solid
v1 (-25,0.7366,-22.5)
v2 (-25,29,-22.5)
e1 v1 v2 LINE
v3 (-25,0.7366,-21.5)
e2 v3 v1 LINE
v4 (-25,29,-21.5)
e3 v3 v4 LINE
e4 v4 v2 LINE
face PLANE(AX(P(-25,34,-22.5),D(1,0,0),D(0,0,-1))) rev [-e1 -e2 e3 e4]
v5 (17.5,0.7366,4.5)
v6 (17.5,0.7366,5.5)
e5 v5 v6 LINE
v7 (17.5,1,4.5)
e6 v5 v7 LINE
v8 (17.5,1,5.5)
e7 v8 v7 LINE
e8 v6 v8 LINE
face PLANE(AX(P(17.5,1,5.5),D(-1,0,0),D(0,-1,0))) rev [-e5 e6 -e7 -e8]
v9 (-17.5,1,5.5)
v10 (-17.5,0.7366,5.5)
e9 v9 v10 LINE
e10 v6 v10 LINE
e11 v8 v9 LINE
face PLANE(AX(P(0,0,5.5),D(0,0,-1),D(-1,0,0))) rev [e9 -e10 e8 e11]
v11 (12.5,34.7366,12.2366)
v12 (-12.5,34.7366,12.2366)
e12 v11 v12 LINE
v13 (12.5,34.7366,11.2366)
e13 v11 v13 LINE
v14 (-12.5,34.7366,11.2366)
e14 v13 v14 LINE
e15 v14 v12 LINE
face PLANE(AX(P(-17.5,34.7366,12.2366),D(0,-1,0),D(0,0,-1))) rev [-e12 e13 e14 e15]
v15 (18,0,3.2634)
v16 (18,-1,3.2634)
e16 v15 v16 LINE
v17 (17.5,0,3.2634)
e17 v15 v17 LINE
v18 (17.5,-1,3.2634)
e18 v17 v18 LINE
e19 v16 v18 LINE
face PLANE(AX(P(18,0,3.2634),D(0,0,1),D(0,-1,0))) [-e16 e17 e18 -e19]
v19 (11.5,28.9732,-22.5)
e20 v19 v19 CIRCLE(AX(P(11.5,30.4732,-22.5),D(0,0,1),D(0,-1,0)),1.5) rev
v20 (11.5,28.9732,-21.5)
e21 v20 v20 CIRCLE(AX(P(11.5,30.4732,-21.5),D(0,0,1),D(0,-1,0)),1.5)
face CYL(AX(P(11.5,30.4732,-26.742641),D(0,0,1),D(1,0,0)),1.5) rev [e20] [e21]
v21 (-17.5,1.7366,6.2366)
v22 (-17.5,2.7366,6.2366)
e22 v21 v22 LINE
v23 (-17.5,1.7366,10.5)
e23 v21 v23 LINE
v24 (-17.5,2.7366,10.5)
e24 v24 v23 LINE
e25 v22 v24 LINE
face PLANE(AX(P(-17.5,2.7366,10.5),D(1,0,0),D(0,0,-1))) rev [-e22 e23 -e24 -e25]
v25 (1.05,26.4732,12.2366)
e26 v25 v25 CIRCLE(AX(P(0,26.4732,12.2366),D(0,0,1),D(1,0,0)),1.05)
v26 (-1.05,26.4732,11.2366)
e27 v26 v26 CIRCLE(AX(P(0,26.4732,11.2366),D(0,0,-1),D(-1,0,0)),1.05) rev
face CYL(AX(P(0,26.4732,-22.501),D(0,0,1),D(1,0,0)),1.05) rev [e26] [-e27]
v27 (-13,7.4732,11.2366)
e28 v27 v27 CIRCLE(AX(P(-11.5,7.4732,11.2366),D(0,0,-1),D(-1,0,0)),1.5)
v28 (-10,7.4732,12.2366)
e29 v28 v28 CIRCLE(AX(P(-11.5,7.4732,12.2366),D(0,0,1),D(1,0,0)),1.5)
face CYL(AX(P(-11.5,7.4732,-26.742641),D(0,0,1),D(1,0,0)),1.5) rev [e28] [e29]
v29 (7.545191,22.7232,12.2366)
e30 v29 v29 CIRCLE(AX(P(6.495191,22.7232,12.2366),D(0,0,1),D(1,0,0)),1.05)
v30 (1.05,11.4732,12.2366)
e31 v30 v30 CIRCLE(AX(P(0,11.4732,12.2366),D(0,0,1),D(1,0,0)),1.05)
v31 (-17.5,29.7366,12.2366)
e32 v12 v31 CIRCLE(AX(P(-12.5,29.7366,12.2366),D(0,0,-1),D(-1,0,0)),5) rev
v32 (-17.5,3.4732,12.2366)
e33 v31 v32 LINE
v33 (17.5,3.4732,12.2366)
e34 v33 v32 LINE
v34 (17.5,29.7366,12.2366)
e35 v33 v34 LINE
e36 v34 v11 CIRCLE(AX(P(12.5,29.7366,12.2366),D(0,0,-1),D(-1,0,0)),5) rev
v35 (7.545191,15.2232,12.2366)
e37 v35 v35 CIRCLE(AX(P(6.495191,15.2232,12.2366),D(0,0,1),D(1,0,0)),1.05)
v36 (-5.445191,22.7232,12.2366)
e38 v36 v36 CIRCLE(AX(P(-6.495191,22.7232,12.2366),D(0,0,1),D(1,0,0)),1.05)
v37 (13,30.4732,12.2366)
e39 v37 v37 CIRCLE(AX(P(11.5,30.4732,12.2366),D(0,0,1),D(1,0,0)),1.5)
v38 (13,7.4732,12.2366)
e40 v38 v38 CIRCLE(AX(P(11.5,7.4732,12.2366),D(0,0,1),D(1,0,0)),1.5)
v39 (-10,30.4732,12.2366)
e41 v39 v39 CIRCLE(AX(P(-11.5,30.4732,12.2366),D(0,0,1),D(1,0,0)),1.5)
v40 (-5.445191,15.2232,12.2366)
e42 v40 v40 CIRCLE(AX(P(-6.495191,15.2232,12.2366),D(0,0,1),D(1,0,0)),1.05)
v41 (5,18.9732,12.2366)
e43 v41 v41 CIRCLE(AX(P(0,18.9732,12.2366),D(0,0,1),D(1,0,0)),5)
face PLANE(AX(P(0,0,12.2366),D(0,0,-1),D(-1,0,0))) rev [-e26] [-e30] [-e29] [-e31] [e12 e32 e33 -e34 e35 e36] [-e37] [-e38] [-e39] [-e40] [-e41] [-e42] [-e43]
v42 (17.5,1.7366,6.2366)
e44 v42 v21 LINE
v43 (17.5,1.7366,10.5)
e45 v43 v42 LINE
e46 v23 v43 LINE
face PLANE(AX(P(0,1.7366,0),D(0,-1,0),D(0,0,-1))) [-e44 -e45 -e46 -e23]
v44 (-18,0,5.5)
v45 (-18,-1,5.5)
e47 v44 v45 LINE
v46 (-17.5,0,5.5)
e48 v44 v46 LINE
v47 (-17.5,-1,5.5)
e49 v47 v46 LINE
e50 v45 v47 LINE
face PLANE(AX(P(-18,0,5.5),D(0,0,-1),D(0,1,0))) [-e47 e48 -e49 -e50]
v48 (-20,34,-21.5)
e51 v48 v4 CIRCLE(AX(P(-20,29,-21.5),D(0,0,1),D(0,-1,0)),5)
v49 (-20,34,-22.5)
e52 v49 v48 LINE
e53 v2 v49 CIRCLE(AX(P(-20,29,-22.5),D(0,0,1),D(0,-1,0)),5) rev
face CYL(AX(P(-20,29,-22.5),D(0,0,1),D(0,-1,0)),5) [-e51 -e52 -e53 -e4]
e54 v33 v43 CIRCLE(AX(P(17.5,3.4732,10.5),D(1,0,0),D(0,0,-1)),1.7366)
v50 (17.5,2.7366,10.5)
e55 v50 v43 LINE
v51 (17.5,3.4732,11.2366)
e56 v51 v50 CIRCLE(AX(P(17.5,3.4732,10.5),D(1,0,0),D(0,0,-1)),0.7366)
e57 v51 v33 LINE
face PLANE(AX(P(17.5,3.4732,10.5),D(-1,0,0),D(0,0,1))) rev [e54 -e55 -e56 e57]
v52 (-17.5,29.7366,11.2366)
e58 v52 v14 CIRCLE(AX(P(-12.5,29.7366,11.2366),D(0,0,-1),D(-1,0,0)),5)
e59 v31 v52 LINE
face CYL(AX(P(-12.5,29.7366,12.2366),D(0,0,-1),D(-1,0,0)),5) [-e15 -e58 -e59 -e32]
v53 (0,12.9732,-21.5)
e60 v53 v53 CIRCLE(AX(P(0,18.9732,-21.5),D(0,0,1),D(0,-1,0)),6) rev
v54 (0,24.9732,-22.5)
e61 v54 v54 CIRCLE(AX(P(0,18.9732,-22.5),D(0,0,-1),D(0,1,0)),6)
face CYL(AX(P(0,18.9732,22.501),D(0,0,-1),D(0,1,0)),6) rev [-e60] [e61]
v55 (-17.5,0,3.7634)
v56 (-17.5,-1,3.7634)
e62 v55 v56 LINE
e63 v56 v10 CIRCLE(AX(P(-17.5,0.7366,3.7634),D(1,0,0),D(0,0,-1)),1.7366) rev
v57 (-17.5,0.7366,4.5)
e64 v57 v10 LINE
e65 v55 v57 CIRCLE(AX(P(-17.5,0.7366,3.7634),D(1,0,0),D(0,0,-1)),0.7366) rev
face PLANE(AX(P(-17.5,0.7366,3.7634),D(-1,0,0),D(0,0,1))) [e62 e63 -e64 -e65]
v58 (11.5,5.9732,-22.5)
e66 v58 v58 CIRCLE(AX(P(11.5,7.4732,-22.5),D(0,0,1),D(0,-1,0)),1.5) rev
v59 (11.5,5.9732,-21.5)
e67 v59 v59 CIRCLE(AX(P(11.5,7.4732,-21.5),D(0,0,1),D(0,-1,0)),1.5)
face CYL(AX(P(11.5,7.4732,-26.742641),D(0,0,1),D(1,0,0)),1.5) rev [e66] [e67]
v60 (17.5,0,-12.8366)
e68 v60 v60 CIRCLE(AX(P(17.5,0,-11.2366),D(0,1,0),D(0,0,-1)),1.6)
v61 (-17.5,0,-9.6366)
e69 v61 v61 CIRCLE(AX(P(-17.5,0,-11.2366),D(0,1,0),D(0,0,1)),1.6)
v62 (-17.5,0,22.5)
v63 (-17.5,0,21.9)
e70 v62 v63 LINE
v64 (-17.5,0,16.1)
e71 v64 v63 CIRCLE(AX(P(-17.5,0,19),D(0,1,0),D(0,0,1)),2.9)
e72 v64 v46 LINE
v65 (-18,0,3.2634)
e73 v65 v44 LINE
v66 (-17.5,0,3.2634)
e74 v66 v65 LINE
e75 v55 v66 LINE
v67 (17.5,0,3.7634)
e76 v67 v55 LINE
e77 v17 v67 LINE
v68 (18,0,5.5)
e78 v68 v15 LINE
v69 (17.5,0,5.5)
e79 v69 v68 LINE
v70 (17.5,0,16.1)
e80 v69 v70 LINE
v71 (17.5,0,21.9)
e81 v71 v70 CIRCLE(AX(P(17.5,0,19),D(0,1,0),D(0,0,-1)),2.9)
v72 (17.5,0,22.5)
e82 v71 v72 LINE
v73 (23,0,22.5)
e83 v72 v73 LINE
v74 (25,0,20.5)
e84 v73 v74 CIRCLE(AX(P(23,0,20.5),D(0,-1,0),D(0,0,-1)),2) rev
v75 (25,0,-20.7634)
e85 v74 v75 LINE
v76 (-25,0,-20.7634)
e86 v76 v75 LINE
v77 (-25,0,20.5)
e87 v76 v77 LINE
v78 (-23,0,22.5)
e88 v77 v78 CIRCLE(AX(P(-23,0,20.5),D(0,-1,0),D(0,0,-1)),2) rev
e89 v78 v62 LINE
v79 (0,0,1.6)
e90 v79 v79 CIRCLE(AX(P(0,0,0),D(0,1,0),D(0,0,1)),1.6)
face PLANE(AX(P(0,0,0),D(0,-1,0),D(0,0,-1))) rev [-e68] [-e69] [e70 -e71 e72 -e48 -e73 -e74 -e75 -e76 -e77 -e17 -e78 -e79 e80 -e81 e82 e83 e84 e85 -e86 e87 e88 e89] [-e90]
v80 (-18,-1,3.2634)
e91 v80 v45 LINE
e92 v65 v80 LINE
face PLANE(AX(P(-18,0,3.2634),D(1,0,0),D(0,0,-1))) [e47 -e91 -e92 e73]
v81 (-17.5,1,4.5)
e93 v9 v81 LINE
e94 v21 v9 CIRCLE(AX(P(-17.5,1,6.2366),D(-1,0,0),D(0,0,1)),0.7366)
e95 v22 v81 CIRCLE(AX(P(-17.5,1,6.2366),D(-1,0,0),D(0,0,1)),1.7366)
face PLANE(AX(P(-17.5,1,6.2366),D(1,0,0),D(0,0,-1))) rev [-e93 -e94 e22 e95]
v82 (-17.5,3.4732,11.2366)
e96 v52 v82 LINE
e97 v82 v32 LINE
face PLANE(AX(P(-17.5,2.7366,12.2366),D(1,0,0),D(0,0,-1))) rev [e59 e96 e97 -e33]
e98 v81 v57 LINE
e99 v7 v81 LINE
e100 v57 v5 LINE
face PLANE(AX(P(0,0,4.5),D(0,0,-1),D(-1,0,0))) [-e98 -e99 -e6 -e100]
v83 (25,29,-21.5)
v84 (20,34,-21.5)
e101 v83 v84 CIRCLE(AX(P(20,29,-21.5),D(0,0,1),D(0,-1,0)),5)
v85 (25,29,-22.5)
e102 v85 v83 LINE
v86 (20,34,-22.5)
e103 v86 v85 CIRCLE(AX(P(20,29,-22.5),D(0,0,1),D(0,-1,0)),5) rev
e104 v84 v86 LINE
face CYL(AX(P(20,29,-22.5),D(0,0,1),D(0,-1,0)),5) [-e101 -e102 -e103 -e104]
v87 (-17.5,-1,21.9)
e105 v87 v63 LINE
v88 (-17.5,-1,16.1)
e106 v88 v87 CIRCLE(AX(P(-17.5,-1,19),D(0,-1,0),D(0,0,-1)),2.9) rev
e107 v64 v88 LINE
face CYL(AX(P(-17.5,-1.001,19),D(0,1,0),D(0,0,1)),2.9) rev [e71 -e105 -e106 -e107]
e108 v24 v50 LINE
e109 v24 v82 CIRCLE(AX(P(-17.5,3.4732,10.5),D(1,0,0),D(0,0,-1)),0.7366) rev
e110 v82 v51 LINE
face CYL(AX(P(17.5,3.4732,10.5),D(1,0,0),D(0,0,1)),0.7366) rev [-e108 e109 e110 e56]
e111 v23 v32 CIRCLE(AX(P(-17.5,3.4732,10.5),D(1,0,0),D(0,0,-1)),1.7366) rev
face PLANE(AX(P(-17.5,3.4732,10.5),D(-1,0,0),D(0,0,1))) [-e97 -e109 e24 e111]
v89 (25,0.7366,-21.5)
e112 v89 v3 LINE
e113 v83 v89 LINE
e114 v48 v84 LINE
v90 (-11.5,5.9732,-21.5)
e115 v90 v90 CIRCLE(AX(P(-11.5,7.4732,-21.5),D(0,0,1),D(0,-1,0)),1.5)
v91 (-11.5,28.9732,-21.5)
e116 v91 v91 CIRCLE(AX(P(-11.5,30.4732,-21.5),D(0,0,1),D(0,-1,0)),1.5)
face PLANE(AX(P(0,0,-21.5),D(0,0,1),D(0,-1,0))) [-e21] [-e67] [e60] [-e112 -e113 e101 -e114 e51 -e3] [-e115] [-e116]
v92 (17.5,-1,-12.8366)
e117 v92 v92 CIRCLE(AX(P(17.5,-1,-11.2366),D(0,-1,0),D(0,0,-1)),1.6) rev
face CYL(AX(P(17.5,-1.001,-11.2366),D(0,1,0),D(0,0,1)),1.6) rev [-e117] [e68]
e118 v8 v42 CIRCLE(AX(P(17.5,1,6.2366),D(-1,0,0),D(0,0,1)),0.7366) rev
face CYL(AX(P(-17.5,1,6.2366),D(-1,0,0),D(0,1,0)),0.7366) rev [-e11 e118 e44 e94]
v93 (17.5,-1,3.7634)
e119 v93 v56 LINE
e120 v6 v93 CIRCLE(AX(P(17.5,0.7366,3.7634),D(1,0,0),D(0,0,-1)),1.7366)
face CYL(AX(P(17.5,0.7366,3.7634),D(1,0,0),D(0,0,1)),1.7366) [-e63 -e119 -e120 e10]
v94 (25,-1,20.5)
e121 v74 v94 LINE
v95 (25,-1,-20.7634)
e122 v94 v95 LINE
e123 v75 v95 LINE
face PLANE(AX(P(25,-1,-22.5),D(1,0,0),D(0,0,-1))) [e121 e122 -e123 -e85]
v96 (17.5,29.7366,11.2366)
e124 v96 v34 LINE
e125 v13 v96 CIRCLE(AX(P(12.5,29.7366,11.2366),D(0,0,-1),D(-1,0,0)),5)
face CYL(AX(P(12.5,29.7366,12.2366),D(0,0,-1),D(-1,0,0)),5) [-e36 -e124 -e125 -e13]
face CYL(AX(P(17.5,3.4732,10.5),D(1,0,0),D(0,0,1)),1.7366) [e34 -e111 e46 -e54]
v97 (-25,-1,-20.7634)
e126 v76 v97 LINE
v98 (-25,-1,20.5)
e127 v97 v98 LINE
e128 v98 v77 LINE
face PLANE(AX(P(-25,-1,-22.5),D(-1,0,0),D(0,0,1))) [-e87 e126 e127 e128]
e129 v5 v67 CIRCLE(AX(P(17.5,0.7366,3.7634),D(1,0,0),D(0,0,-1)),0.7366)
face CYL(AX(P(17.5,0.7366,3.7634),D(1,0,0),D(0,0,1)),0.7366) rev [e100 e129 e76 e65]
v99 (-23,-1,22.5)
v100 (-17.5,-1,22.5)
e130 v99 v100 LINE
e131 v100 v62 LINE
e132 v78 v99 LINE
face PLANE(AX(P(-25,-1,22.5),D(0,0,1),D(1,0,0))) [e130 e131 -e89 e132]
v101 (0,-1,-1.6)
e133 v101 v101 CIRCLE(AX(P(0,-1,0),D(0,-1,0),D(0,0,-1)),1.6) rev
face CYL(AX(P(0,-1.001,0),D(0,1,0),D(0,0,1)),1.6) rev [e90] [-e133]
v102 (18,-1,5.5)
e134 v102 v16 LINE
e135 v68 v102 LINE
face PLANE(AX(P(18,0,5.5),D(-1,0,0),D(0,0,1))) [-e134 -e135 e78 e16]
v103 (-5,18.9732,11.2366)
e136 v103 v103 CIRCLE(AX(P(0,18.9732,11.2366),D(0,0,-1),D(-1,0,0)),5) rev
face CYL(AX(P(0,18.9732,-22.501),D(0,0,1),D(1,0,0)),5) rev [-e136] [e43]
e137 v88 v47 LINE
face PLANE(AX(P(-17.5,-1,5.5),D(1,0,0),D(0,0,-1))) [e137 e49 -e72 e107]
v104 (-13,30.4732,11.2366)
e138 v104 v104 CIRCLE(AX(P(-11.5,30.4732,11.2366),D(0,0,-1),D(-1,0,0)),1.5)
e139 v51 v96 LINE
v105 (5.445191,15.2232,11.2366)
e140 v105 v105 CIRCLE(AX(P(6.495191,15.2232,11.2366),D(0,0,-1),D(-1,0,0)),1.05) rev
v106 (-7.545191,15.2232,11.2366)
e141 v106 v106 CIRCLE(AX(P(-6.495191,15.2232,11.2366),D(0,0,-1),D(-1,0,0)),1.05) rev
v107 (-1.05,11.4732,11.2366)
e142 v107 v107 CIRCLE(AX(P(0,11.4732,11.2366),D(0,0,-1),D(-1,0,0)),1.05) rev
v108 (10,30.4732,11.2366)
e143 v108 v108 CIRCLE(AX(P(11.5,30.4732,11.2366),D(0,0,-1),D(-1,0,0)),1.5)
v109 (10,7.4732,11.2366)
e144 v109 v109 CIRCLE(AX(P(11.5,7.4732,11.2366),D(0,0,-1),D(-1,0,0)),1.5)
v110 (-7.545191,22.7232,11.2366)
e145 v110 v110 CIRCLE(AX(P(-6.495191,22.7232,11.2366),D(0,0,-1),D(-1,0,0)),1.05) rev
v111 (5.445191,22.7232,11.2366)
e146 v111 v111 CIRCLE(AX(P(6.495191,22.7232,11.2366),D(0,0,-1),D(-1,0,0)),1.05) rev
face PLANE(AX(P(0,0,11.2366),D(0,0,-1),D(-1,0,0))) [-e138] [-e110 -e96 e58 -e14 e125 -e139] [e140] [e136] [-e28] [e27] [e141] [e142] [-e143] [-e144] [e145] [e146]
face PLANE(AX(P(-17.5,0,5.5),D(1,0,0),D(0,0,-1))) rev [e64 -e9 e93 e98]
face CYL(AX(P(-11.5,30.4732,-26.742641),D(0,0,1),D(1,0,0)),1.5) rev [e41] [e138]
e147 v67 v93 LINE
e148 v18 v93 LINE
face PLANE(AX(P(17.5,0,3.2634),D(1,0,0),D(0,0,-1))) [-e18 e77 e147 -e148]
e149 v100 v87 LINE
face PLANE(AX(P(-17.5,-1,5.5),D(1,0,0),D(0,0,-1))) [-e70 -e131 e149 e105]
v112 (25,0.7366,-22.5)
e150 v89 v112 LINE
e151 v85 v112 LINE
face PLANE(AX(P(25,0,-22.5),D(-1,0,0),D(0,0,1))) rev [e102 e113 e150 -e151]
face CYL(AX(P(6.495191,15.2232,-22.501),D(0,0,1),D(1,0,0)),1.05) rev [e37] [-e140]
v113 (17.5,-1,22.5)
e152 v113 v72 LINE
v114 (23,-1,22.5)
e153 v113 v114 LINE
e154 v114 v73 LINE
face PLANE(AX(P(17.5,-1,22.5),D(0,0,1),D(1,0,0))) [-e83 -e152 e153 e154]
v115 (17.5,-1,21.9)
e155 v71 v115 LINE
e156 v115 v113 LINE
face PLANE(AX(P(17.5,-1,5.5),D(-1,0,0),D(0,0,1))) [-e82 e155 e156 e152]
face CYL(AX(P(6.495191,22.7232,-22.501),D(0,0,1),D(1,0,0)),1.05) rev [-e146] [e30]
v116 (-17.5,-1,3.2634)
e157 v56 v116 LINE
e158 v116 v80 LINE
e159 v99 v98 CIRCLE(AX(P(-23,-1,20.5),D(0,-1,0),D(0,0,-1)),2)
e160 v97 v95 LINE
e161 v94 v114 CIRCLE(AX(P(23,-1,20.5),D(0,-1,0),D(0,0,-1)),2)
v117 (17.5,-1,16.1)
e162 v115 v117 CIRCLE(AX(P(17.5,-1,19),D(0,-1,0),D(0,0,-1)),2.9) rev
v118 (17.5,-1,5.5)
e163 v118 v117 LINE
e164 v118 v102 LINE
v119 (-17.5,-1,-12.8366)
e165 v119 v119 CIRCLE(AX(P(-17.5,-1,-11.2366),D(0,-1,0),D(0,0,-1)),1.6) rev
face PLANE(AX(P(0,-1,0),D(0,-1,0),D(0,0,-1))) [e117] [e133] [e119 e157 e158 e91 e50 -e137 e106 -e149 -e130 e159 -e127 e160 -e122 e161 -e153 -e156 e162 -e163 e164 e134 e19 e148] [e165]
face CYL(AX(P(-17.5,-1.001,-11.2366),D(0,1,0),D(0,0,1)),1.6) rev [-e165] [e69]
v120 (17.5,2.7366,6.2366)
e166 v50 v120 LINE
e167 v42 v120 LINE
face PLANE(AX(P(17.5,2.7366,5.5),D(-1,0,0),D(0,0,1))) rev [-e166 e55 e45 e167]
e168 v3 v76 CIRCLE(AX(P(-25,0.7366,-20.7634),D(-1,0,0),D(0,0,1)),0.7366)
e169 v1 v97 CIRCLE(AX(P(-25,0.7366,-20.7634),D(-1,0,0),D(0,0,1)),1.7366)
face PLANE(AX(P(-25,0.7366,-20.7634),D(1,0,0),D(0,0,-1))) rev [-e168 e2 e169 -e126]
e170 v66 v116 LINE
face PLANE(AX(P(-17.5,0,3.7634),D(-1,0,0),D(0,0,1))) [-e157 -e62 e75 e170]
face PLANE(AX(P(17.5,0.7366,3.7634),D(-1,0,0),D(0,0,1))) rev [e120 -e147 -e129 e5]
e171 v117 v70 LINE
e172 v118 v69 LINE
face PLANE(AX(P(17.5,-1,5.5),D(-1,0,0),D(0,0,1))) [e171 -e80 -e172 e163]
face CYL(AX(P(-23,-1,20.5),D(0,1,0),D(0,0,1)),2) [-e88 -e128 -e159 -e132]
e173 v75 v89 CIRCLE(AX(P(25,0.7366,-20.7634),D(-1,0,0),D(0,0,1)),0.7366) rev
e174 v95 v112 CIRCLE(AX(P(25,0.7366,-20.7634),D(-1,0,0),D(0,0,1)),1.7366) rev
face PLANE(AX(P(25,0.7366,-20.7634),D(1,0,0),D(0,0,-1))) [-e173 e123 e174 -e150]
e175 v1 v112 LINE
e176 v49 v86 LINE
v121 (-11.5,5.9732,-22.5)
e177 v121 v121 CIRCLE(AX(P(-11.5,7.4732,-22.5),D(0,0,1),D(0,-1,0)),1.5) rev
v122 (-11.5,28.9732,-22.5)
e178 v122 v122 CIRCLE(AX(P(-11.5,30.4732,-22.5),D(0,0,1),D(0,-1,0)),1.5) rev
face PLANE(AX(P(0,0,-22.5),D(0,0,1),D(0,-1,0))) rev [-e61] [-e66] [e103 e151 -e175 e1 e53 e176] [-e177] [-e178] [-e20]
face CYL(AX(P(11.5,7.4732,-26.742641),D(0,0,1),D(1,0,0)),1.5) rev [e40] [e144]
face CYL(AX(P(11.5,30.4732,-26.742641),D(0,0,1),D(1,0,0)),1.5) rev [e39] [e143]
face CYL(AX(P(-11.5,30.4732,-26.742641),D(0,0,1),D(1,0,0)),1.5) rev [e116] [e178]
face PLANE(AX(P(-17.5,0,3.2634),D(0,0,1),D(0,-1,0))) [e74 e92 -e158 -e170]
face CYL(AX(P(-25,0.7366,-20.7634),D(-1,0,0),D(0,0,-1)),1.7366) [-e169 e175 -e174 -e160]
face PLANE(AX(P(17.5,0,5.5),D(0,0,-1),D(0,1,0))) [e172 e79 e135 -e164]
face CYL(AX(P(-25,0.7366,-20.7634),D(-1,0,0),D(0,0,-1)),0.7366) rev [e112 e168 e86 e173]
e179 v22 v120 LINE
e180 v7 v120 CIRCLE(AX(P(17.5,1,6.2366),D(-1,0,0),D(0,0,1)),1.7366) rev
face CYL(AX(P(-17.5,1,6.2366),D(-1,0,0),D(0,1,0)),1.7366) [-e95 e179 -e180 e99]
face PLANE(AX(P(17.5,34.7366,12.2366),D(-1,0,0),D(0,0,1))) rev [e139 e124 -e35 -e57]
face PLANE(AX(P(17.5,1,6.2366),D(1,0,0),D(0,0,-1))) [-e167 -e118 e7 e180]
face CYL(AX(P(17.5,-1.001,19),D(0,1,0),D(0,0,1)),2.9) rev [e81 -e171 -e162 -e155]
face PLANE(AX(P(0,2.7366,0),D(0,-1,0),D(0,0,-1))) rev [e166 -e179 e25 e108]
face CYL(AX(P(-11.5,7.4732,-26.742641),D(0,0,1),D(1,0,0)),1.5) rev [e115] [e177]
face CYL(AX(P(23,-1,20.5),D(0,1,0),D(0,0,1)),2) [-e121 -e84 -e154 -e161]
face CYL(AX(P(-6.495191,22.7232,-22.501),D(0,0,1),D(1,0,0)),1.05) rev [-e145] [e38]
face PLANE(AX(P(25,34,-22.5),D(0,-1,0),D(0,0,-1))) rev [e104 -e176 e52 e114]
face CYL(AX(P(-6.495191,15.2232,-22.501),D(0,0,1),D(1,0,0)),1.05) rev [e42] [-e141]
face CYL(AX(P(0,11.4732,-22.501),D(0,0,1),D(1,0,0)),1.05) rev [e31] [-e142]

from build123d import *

# Parameters (mm, degrees)
SM_BASE_FLANGE_1_DEPTH           = 1
SM_START                         = -18
SM_EDGE_FLANGE_1_DEPTH           = 36
SM_EDGE_FLANGE_1_2_DEPTH         = 0.5
SM_START_2                       = 17.5
SM_EDGE_FLANGE_1_3_DEPTH         = 0.5
SM_START_3                       = -17.5
SM_EDGE_FLANGE_1_4_DEPTH         = 35
SM_EDGE_FLANGE_3_DEPTH           = 35
SM_EDGE_FLANGE_4_DEPTH           = 35
CUT_EXTRUDE_1_REACH              = 57.12
SKETCH_10_R                      = 1.05
SKETCH_10_R_2                    = 5
SM_EDGE_FLANGE_2_STRIP_W         = 5.4732
SM_EDGE_FLANGE_2_STRIP_H         = 1
SM_EDGE_FLANGE_2_STRIP_CUT_DEPTH = 50
SM_EDGE_FLANGE_2_DEPTH           = 50
CUT_EXTRUDE_2_REACH              = 57.12
SKETCH_10_3_R                    = 1.5
CUT_EXTRUDE_3_REACH              = 64.102
SKETCH_18_R                      = 6
FILLET_1_R                       = 5
CUT_EXTRUDE_6_REACH              = 50.352
SKETCH_19_R                      = 2.9
SKETCH_19_R_2                    = 1.6
FILLET_2_R                       = 2


# Read off the part's stored shape, not the designer's step: 边线-法兰1
# Sheet-metal steps are written as plain solids
with BuildPart() as part:
    # Sketch 2 → 基体-法兰1 (new body)
    with BuildSketch(Plane(origin=(0, 0, 0), x_dir=(1, 0, 0), z_dir=(0, 1, 0))):
        Polygon((-17.5, -5.5), (17.5, -5.5), (17.5, -22.5), (25, -22.5), (25, 22.5), (-25, 22.5), (-25, -22.5), (-17.5, -22.5), align=None)
    extrude(amount=-SM_BASE_FLANGE_1_DEPTH)

    # 边线-法兰1 outline → 边线-法兰1 (cut)
    with BuildSketch(Plane.YZ.offset(SM_START)):
        with BuildLine():
            Line((0, 5.5), (-1, 5.5))
            Line((-1, 5.5), (-1, 3.7634))
            ThreePointArc((-1, 3.7634), (-0.728828115, 4.695226164), (0, 5.33604109))
            Line((0, 5.33604109), (0, 5.5))
        make_face()
    extrude(amount=SM_EDGE_FLANGE_1_DEPTH, mode=Mode.SUBTRACT)

    # Sm Edge Flange 1 2 outline → Sm Edge Flange 1 2 (cut)
    with BuildSketch(Plane.YZ.offset(SM_START)):
        with BuildLine():
            ThreePointArc((0, 5.33604109), (-0.728828115, 4.695226164), (-1, 3.7634))
            Line((-1, 3.7634), (-1, 3.2634))
            Line((-1, 3.2634), (0, 3.2634))
            Line((0, 3.2634), (0, 5.33604109))
        make_face()
    extrude(amount=SM_EDGE_FLANGE_1_2_DEPTH, mode=Mode.SUBTRACT)

    # Sm Edge Flange 1 3 outline → Sm Edge Flange 1 3 (cut)
    with BuildSketch(Plane.YZ.offset(SM_START_2)):
        with BuildLine():
            ThreePointArc((0, 5.33604109), (-0.728828115, 4.695226164), (-1, 3.7634))
            Line((-1, 3.7634), (-1, 3.2634))
            Line((-1, 3.2634), (0, 3.2634))
            Line((0, 3.2634), (0, 5.33604109))
        make_face()
    extrude(amount=SM_EDGE_FLANGE_1_3_DEPTH, mode=Mode.SUBTRACT)

    # Sm Edge Flange 1 4 outline → Sm Edge Flange 1 4 (add)
    with BuildSketch(Plane.YZ.offset(SM_START_3)):
        with BuildLine():
            ThreePointArc((0.7366, 5.5), (0.359286442, 5.458514757), (0, 5.33604109))
            Line((0, 5.33604109), (0, 3.7634))
            ThreePointArc((0, 3.7634), (0.215745145, 4.284254855), (0.7366, 4.5))
            Line((0.7366, 4.5), (1, 4.5))
            Line((1, 4.5), (1, 5.5))
            Line((1, 5.5), (0.7366, 5.5))
        make_face()
    extrude(amount=SM_EDGE_FLANGE_1_4_DEPTH)

    # 边线-法兰3 section (across the edge) → 边线-法兰3 (add)
    with BuildSketch(Plane(origin=(17.5, 1.7366, 5.5), x_dir=(0, -1, 0), z_dir=(-1, 0, 0))):
        with BuildLine():
            Line((-1, 0.7366), (-1, 5))
            Line((-1, 5), (0, 5))
            Line((0, 5), (0, 0.7366))
            ThreePointArc((0, 0.7366), (0.215745145, 0.215745145), (0.7366, 0))
            Line((0.7366, 0), (0.7366, -1))
            ThreePointArc((0.7366, -1), (-0.491361636, -0.491361636), (-1, 0.7366))
        make_face()
    extrude(amount=SM_EDGE_FLANGE_3_DEPTH)

    # 边线-法兰4 section (across the edge) → 边线-法兰4 (add)
    with BuildSketch(Plane(origin=(-17.5, 2.7366, 11.2366), x_dir=(0, 0, -1), z_dir=(1, 0, 0))):
        with BuildLine():
            Line((-1, 0.7366), (-1, 32))
            Line((-1, 32), (0, 32))
            Line((0, 32), (0, 0.7366))
            ThreePointArc((0, 0.7366), (0.215745145, 0.215745145), (0.7366, 0))
            Line((0.7366, 0), (0.7366, -1))
            ThreePointArc((0.7366, -1), (-0.491361636, -0.491361636), (-1, 0.7366))
        make_face()
    extrude(amount=SM_EDGE_FLANGE_4_DEPTH)

    # 草图10 → 切除-拉伸1 (cut, up to next)
    with BuildSketch(Plane.XY.offset(12.2366), mode=Mode.PRIVATE) as cut_extrude_1_sk1:
        with Locations((0, 26.4732)):
            Circle(SKETCH_10_R)
    cut_extrude_1_tool1 = extrude(cut_extrude_1_sk1.sketch, amount=-CUT_EXTRUDE_1_REACH, mode=Mode.PRIVATE) & part.part
    # 草图10 → 切除-拉伸1 (cut, up to next)
    with BuildSketch(Plane.XY.offset(12.2366), mode=Mode.PRIVATE) as cut_extrude_1_sk2:
        with Locations((-6.495190528, 22.7232)):
            Circle(SKETCH_10_R)
    cut_extrude_1_tool2 = extrude(cut_extrude_1_sk2.sketch, amount=-CUT_EXTRUDE_1_REACH, mode=Mode.PRIVATE) & part.part
    # 草图10 → 切除-拉伸1 (cut, up to next)
    with BuildSketch(Plane.XY.offset(12.2366), mode=Mode.PRIVATE) as cut_extrude_1_sk3:
        with Locations((-6.495190528, 15.2232)):
            Circle(SKETCH_10_R)
    cut_extrude_1_tool3 = extrude(cut_extrude_1_sk3.sketch, amount=-CUT_EXTRUDE_1_REACH, mode=Mode.PRIVATE) & part.part
    # 草图10 → 切除-拉伸1 (cut, up to next)
    with BuildSketch(Plane.XY.offset(12.2366), mode=Mode.PRIVATE) as cut_extrude_1_sk4:
        with Locations((0, 18.9732)):
            Circle(SKETCH_10_R_2)
    cut_extrude_1_tool4 = extrude(cut_extrude_1_sk4.sketch, amount=-CUT_EXTRUDE_1_REACH, mode=Mode.PRIVATE) & part.part
    # 草图10 → 切除-拉伸1 (cut, up to next)
    with BuildSketch(Plane.XY.offset(12.2366), mode=Mode.PRIVATE) as cut_extrude_1_sk5:
        with Locations((0, 11.4732)):
            Circle(SKETCH_10_R)
    cut_extrude_1_tool5 = extrude(cut_extrude_1_sk5.sketch, amount=-CUT_EXTRUDE_1_REACH, mode=Mode.PRIVATE) & part.part
    # 草图10 → 切除-拉伸1 (cut, up to next)
    with BuildSketch(Plane.XY.offset(12.2366), mode=Mode.PRIVATE) as cut_extrude_1_sk6:
        with Locations((6.495190528, 15.2232)):
            Circle(SKETCH_10_R)
    cut_extrude_1_tool6 = extrude(cut_extrude_1_sk6.sketch, amount=-CUT_EXTRUDE_1_REACH, mode=Mode.PRIVATE) & part.part
    # 草图10 → 切除-拉伸1 (cut, up to next)
    with BuildSketch(Plane.XY.offset(12.2366), mode=Mode.PRIVATE) as cut_extrude_1_sk7:
        with Locations((6.495190528, 22.7232)):
            Circle(SKETCH_10_R)
    cut_extrude_1_tool7 = extrude(cut_extrude_1_sk7.sketch, amount=-CUT_EXTRUDE_1_REACH, mode=Mode.PRIVATE) & part.part
    add(cut_extrude_1_tool1.solids().sort_by_distance((0, 26.4732, 12.2366))[0], mode=Mode.SUBTRACT)
    add(cut_extrude_1_tool2.solids().sort_by_distance((-6.495191, 22.7232, 12.2366))[0], mode=Mode.SUBTRACT)
    add(cut_extrude_1_tool3.solids().sort_by_distance((-6.495191, 15.2232, 12.2366))[0], mode=Mode.SUBTRACT)
    add(cut_extrude_1_tool4.solids().sort_by_distance((0, 18.9732, 12.2366))[0], mode=Mode.SUBTRACT)
    add(cut_extrude_1_tool5.solids().sort_by_distance((0, 11.4732, 12.2366))[0], mode=Mode.SUBTRACT)
    add(cut_extrude_1_tool6.solids().sort_by_distance((6.495191, 15.2232, 12.2366))[0], mode=Mode.SUBTRACT)
    add(cut_extrude_1_tool7.solids().sort_by_distance((6.495191, 22.7232, 12.2366))[0], mode=Mode.SUBTRACT)

    # 边线-法兰2 strip (across the edge) → 边线-法兰2 strip cut (cut)
    with BuildSketch(Plane(origin=(25, 0, -22.5), x_dir=(0, 0, 1), z_dir=(-1, 0, 0))):
        with Locations((-1, -0.5)):
            Rectangle(SM_EDGE_FLANGE_2_STRIP_W, SM_EDGE_FLANGE_2_STRIP_H)
    extrude(amount=SM_EDGE_FLANGE_2_STRIP_CUT_DEPTH, mode=Mode.SUBTRACT)

    # 边线-法兰2 section (across the edge) → 边线-法兰2 (add)
    with BuildSketch(Plane(origin=(25, 0, -22.5), x_dir=(0, 0, 1), z_dir=(-1, 0, 0))):
        with BuildLine():
            Line((0, 0.7366), (0, 34))
            Line((0, 34), (1, 34))
            Line((1, 34), (1, 0.7366))
            ThreePointArc((1, 0.7366), (1.215745145, 0.215745145), (1.7366, 0))
            Line((1.7366, 0), (1.7366, -1))
            ThreePointArc((1.7366, -1), (0.508638364, -0.491361636), (0, 0.7366))
        make_face()
    extrude(amount=SM_EDGE_FLANGE_2_DEPTH)

    # 切除-拉伸2: up to this face of the body (flat: up to its plane)
    cut_extrude_2_end = Plane(part.part.faces().sort_by_distance((0, 17.3683, -22.5))[0])
    # 草图10<3> → 切除-拉伸2 (cut, up to the picked face)
    with BuildSketch(Plane.XY.offset(12.2366), mode=Mode.PRIVATE) as cut_extrude_2_sk1:
        with Locations(Location((-11.5, 30.4732, 0), (0, 0, 270))):
            Circle(SKETCH_10_3_R)
    cut_extrude_2_tool1 = split(extrude(cut_extrude_2_sk1.sketch, amount=-CUT_EXTRUDE_2_REACH, mode=Mode.PRIVATE), bisect_by=cut_extrude_2_end, keep=Keep.BOTH, mode=Mode.PRIVATE)
    # 草图10<3> → 切除-拉伸2 (cut, up to the picked face)
    with BuildSketch(Plane.XY.offset(12.2366), mode=Mode.PRIVATE) as cut_extrude_2_sk2:
        with Locations(Location((-11.5, 7.4732, 0), (0, 0, 270))):
            Circle(SKETCH_10_3_R)
    cut_extrude_2_tool2 = split(extrude(cut_extrude_2_sk2.sketch, amount=-CUT_EXTRUDE_2_REACH, mode=Mode.PRIVATE), bisect_by=cut_extrude_2_end, keep=Keep.BOTH, mode=Mode.PRIVATE)
    # 草图10<3> → 切除-拉伸2 (cut, up to the picked face)
    with BuildSketch(Plane.XY.offset(12.2366), mode=Mode.PRIVATE) as cut_extrude_2_sk3:
        with Locations(Location((11.5, 30.4732, 0), (0, 0, 270))):
            Circle(SKETCH_10_3_R)
    cut_extrude_2_tool3 = split(extrude(cut_extrude_2_sk3.sketch, amount=-CUT_EXTRUDE_2_REACH, mode=Mode.PRIVATE), bisect_by=cut_extrude_2_end, keep=Keep.BOTH, mode=Mode.PRIVATE)
    # 草图10<3> → 切除-拉伸2 (cut, up to the picked face)
    with BuildSketch(Plane.XY.offset(12.2366), mode=Mode.PRIVATE) as cut_extrude_2_sk4:
        with Locations(Location((11.5, 7.4732, 0), (0, 0, 270))):
            Circle(SKETCH_10_3_R)
    cut_extrude_2_tool4 = split(extrude(cut_extrude_2_sk4.sketch, amount=-CUT_EXTRUDE_2_REACH, mode=Mode.PRIVATE), bisect_by=cut_extrude_2_end, keep=Keep.BOTH, mode=Mode.PRIVATE)
    add(cut_extrude_2_tool1.solids().sort_by(Axis((-11.5, 30.4732, 12.2366), (0, 0, -1)))[0], mode=Mode.SUBTRACT)
    add(cut_extrude_2_tool2.solids().sort_by(Axis((-11.5, 7.4732, 12.2366), (0, 0, -1)))[0], mode=Mode.SUBTRACT)
    add(cut_extrude_2_tool3.solids().sort_by(Axis((11.5, 30.4732, 12.2366), (0, 0, -1)))[0], mode=Mode.SUBTRACT)
    add(cut_extrude_2_tool4.solids().sort_by(Axis((11.5, 7.4732, 12.2366), (0, 0, -1)))[0], mode=Mode.SUBTRACT)

    # 草图18 → 切除-拉伸3 (cut, up to next)
    with BuildSketch(Plane(origin=(0, 0, -22.5), x_dir=(-1, 0, 0), z_dir=(0, 0, -1)), mode=Mode.PRIVATE) as cut_extrude_3_sk1:
        with Locations(Location((0, 18.9732, 0), (0, 0, 90))):
            Circle(SKETCH_18_R)
    cut_extrude_3_tool1 = extrude(cut_extrude_3_sk1.sketch, amount=-CUT_EXTRUDE_3_REACH, mode=Mode.PRIVATE) & part.part
    add(cut_extrude_3_tool1.solids().sort_by_distance((0, 18.9732, -22.5))[0], mode=Mode.SUBTRACT)

    # 圆角1
    fillet_1_edges = [part.edges().sort_by_distance(p)[0] for p in [
        (-17.5, 34.7366, 11.7366),
        (17.5, 34.7366, 11.7366),
        (25, 34, -22),
        (-25, 34, -22),
    ]]
    fillet(fillet_1_edges, radius=FILLET_1_R)

    # 草图19 → 切除-拉伸6 (cut, up to next)
    with BuildSketch(Plane(origin=(0, 0, 0), x_dir=(1, 0, 0), z_dir=(0, 1, 0)), mode=Mode.PRIVATE) as cut_extrude_6_sk1:
        with Locations((-17.5, -19)):
            Circle(SKETCH_19_R)
    cut_extrude_6_tool1 = extrude(cut_extrude_6_sk1.sketch, amount=-CUT_EXTRUDE_6_REACH, mode=Mode.PRIVATE) & part.part
    # 草图19 → 切除-拉伸6 (cut, up to next)
    with BuildSketch(Plane(origin=(0, 0, 0), x_dir=(1, 0, 0), z_dir=(0, 1, 0)), mode=Mode.PRIVATE) as cut_extrude_6_sk2:
        with Locations((17.5, -19)):
            Circle(SKETCH_19_R)
    cut_extrude_6_tool2 = extrude(cut_extrude_6_sk2.sketch, amount=-CUT_EXTRUDE_6_REACH, mode=Mode.PRIVATE) & part.part
    # 草图19 → 切除-拉伸6 (cut, up to next)
    with BuildSketch(Plane(origin=(0, 0, 0), x_dir=(1, 0, 0), z_dir=(0, 1, 0)), mode=Mode.PRIVATE) as cut_extrude_6_sk3:
        with Locations(Location((-17.5, 11.2366, 0), (0, 0, 270))):
            Circle(SKETCH_19_R_2)
    cut_extrude_6_tool3 = extrude(cut_extrude_6_sk3.sketch, amount=-CUT_EXTRUDE_6_REACH, mode=Mode.PRIVATE) & part.part
    # 草图19 → 切除-拉伸6 (cut, up to next)
    with BuildSketch(Plane(origin=(0, 0, 0), x_dir=(1, 0, 0), z_dir=(0, 1, 0)), mode=Mode.PRIVATE) as cut_extrude_6_sk4:
        with Locations(Location((17.5, 11.2366, 0), (0, 0, 90))):
            Circle(SKETCH_19_R_2)
    cut_extrude_6_tool4 = extrude(cut_extrude_6_sk4.sketch, amount=-CUT_EXTRUDE_6_REACH, mode=Mode.PRIVATE) & part.part
    # 草图19 → 切除-拉伸6 (cut, up to next)
    with BuildSketch(Plane(origin=(0, 0, 0), x_dir=(1, 0, 0), z_dir=(0, 1, 0)), mode=Mode.PRIVATE) as cut_extrude_6_sk5:
        with Locations(Location((0, 0, 0), (0, 0, 270))):
            Circle(SKETCH_19_R_2)
    cut_extrude_6_tool5 = extrude(cut_extrude_6_sk5.sketch, amount=-CUT_EXTRUDE_6_REACH, mode=Mode.PRIVATE) & part.part
    add(cut_extrude_6_tool1.solids().sort_by_distance((-17.5, 0, 19))[0], mode=Mode.SUBTRACT)
    add(cut_extrude_6_tool2.solids().sort_by_distance((17.5, 0, 19))[0], mode=Mode.SUBTRACT)
    add(cut_extrude_6_tool3.solids().sort_by_distance((-17.5, 0, -11.2366))[0], mode=Mode.SUBTRACT)
    add(cut_extrude_6_tool4.solids().sort_by_distance((17.5, 0, -11.2366))[0], mode=Mode.SUBTRACT)
    add(cut_extrude_6_tool5.solids().sort_by_distance((0, 0, 0))[0], mode=Mode.SUBTRACT)

    # 圆角2
    fillet_2_edges = [part.edges().sort_by_distance(p)[0] for p in [
        (-25, -0.5, 22.5),
        (25, -0.5, 22.5),
    ]]
    fillet(fillet_2_edges, radius=FILLET_2_R)


solid = part.part
